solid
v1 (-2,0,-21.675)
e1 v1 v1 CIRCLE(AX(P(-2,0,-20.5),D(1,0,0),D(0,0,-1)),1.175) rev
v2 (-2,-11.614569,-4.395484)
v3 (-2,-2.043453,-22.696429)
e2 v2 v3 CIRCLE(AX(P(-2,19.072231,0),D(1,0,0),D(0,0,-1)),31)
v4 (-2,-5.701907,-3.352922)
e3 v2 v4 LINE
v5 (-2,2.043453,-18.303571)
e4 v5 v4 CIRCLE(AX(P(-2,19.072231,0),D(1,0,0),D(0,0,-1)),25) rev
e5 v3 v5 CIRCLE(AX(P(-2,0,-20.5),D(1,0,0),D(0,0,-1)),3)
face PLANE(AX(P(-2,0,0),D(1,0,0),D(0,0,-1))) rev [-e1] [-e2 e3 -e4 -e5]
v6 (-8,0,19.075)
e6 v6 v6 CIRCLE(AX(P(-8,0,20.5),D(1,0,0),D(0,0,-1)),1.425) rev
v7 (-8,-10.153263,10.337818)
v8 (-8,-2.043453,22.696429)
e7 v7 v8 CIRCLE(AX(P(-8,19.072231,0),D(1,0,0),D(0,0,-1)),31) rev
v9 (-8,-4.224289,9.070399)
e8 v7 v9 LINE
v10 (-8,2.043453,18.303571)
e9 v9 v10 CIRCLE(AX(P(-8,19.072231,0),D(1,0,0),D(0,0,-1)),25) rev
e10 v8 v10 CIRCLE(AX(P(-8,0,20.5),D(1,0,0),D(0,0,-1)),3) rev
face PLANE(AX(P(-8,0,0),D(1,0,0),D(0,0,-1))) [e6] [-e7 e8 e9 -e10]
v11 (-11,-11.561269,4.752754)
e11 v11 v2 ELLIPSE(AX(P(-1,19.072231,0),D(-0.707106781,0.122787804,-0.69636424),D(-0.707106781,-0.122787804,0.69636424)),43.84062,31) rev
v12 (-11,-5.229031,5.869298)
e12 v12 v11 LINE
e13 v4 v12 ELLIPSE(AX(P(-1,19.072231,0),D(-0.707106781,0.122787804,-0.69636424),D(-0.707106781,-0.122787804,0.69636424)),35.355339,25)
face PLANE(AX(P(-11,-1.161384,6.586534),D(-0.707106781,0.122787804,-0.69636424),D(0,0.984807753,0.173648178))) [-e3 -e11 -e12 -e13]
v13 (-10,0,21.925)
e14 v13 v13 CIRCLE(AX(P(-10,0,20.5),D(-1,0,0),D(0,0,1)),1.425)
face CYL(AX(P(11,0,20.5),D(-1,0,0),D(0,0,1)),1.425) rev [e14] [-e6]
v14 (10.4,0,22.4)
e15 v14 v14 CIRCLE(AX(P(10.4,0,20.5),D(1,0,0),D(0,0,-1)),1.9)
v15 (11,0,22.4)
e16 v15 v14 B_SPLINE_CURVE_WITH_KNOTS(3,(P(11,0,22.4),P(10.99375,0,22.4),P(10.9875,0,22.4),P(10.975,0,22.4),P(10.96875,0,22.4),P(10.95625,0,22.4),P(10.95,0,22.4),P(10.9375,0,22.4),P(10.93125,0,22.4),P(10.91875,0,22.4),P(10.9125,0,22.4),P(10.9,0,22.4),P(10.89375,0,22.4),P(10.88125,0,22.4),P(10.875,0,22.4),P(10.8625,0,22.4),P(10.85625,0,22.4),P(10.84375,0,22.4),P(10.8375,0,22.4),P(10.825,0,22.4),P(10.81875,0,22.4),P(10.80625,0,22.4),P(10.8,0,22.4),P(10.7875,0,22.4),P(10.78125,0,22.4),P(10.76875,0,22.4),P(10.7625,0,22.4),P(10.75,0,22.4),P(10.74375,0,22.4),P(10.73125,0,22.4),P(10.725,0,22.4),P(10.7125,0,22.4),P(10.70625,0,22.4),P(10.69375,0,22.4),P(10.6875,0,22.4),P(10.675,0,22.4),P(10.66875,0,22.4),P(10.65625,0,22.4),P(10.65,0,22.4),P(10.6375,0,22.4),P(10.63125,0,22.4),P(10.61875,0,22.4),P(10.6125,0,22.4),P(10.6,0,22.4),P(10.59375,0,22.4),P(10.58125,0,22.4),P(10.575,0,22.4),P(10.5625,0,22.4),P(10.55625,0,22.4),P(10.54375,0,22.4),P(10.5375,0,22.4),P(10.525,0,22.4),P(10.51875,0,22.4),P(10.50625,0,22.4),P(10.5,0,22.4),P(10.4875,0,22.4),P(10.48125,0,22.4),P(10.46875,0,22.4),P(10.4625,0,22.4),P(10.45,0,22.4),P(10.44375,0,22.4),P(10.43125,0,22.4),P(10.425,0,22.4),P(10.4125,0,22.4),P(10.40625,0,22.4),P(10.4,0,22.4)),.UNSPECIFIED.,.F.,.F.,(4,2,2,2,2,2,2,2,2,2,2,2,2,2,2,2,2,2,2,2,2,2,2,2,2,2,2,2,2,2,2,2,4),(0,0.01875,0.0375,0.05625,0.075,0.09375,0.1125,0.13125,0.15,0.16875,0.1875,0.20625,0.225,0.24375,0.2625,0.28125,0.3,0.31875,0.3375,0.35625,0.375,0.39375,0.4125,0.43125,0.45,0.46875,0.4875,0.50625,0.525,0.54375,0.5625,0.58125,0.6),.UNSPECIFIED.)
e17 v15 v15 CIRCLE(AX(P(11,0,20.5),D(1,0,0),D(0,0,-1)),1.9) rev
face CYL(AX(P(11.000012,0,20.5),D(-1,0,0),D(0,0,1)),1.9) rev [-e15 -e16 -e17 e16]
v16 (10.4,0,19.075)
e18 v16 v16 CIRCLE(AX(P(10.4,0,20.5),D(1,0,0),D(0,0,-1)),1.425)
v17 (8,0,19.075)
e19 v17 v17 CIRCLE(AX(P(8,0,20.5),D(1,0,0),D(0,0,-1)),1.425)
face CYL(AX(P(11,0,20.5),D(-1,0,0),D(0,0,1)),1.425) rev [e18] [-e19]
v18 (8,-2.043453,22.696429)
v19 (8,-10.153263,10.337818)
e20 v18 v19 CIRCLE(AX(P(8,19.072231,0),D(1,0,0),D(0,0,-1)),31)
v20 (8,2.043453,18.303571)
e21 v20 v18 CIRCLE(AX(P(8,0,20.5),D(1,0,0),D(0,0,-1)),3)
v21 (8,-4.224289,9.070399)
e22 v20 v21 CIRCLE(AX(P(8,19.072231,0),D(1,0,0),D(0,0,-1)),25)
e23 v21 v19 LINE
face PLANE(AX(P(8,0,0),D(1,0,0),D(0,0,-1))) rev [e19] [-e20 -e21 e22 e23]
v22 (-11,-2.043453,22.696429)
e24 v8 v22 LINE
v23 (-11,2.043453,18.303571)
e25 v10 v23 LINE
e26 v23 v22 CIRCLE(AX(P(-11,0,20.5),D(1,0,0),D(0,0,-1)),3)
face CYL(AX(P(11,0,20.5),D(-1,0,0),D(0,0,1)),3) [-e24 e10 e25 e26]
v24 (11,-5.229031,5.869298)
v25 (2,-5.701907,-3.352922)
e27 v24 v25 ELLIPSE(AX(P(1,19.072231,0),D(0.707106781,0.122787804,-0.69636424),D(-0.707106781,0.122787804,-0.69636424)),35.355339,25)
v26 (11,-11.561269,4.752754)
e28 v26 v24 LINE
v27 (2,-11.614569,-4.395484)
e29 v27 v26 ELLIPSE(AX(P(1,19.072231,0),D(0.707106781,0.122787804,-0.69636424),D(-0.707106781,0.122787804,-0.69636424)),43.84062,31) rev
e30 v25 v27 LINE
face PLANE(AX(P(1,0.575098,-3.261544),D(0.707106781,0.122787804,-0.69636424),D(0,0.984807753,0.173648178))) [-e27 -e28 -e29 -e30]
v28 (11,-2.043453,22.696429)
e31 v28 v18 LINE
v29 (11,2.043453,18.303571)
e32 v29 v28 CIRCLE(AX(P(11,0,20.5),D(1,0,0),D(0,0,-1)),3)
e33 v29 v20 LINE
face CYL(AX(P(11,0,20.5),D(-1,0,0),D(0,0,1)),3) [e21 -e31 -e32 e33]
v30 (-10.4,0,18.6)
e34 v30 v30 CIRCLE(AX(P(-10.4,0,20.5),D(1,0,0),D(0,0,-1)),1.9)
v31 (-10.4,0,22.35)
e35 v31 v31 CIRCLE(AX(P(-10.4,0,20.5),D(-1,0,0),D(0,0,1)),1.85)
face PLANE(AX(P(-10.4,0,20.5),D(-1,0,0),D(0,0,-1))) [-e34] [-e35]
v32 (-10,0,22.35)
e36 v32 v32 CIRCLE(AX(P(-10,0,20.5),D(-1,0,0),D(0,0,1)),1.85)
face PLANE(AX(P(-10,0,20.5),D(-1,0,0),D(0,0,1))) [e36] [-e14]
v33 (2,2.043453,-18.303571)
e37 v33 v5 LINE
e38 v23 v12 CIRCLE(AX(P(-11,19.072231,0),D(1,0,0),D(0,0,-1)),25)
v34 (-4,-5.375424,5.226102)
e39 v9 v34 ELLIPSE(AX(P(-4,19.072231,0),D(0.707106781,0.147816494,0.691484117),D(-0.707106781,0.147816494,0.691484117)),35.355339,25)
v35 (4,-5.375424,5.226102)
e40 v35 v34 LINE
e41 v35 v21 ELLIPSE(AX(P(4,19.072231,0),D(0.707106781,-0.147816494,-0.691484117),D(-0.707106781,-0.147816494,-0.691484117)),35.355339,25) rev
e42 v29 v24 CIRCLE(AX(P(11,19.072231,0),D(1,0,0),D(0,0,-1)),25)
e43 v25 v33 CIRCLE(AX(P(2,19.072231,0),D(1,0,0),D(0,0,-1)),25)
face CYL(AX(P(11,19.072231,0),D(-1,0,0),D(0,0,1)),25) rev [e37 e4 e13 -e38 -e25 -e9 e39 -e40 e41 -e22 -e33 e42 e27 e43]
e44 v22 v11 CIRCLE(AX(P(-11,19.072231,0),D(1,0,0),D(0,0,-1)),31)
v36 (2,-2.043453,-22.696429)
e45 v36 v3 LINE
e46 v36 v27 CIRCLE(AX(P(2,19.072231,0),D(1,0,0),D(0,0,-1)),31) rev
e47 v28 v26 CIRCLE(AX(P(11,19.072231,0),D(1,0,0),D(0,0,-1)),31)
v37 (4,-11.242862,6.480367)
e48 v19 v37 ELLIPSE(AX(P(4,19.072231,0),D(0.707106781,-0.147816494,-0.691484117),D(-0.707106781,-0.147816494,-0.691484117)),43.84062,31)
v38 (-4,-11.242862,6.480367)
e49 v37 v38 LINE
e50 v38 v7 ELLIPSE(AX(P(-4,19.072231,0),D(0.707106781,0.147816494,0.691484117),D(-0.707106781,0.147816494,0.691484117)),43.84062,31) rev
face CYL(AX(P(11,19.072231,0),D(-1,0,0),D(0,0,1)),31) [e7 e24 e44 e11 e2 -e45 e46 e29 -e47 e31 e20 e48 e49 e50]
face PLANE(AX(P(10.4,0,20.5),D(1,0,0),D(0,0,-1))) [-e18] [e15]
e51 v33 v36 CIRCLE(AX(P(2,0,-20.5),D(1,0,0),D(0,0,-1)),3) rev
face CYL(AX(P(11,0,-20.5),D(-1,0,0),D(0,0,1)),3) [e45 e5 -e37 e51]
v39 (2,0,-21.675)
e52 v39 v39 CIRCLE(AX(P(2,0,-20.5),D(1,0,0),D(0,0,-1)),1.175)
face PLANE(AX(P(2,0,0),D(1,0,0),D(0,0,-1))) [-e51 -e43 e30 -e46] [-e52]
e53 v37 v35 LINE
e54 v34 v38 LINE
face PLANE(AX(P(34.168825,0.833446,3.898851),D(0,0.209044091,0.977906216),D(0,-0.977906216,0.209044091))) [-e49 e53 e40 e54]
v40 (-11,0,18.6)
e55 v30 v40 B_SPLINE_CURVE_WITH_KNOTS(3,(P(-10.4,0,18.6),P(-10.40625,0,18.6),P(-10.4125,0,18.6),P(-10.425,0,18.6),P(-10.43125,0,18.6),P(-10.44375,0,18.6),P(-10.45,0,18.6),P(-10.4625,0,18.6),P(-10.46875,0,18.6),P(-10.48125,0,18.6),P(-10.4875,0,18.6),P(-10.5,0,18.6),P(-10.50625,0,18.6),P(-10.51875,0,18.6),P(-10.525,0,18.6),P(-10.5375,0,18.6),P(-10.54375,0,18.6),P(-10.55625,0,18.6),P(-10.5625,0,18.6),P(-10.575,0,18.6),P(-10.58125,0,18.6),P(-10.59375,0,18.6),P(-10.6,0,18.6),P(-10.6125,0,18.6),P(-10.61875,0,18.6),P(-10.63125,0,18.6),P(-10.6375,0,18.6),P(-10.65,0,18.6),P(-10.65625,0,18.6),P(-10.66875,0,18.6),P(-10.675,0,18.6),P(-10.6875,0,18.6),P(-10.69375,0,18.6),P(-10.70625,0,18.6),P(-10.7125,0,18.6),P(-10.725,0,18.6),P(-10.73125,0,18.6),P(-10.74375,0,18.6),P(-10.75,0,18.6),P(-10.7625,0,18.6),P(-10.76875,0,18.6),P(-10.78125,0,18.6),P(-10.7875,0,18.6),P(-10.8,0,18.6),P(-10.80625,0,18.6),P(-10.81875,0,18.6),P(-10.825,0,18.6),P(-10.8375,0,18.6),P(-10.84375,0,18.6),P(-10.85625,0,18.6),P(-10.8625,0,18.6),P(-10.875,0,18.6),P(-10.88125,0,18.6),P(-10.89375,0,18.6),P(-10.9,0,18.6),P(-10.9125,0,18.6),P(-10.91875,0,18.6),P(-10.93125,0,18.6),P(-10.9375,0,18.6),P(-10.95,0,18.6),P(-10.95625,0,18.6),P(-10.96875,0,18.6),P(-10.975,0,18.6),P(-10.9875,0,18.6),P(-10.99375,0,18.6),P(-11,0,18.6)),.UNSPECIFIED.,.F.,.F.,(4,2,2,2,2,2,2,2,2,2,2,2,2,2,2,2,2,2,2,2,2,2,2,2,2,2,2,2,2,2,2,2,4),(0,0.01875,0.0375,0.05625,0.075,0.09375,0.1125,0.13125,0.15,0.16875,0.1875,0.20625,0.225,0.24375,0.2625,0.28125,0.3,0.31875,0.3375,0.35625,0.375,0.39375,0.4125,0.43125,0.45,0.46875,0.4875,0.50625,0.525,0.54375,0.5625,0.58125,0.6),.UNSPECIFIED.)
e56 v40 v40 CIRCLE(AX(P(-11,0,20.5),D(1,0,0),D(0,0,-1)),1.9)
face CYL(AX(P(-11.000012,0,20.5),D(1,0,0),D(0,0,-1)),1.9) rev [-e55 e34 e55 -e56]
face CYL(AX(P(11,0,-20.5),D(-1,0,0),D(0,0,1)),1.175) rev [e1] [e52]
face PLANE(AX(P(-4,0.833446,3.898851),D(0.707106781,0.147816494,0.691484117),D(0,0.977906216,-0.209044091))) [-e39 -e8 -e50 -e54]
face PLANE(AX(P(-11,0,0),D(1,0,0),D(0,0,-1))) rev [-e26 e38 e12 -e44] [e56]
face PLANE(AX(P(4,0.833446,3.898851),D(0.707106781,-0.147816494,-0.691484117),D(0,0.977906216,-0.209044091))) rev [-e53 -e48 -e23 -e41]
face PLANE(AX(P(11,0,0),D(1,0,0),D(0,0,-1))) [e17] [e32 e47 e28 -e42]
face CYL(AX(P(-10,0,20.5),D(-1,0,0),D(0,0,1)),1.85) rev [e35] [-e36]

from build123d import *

# Parameters (mm, degrees)
SKETCH_1_R               = 1.175
SKETCH_1_R_2             = 1.425
EXTRUDE_1_DEPTH          = 11
CUT_EXTRUDE_1_DEPTH      = 8
CUT_EXTRUDE_1_DEPTH_BACK = 8
SKETCH_1_6_R             = 1.425
SKETCH_4_R               = 1.175
CUT_EXTRUDE_3_DEPTH      = 9
CUT_EXTRUDE_START        = -0.6
SKETCH_6_R               = 1.9
CUT_EXTRUDE_5_DEPTH      = 35.929603411
SKETCH_3_R               = 1.85
CUT_EXTRUDE_2_DEPTH      = 1
CHAMFER_2_SIZE           = 10
CHAMFER_3_SIZE           = 4


with BuildPart() as part:
    # 草图1 → 凸台-拉伸1 (new, symmetric)
    with BuildSketch(Plane(origin=(0, 0, 0), x_dir=(0, 0, -1), z_dir=(1, 0, 0))):
        with BuildLine():
            ThreePointArc((-22.696428571, -2.043453335), (0, -11.927768877), (22.696428571, -2.043453335))
            ThreePointArc((22.696428571, -2.043453335), (22.543453335, 2.196428571), (18.303571429, 2.043453335))
            ThreePointArc((18.303571429, 2.043453335), (0, -5.927768877), (-18.303571429, 2.043453335))
            ThreePointArc((-18.303571429, 2.043453335), (-22.543453335, 2.196428571), (-22.696428571, -2.043453335))
        make_face()
        with Locations((20.5, 0)):
            Circle(SKETCH_1_R, mode=Mode.SUBTRACT)
        with Locations((-20.5, 0)):
            Circle(SKETCH_1_R_2, mode=Mode.SUBTRACT)
    extrude(amount=EXTRUDE_1_DEPTH, both=True)

    # 草图1<6> → 切除-拉伸1 (cut, two sides: drawn at the far end of the back side and taken through both)
    with BuildSketch(Plane(origin=(0, 0, 0), x_dir=(0, 0, -1), z_dir=(1, 0, 0)).offset(-CUT_EXTRUDE_1_DEPTH_BACK)):
        with BuildLine():
            ThreePointArc((-22.696428571, -2.043453335), (-15.296359873, -7.89110277), (-6.48036682, -11.242861585))
            Line((-6.48036682, -11.242861585), (-5.226102274, -5.375424287))
            ThreePointArc((-5.226102274, -5.375424287), (-12.335774091, -2.672392985), (-18.303571429, 2.043453335))
            ThreePointArc((-18.303571429, 2.043453335), (-22.543453335, 2.196428571), (-22.696428571, -2.043453335))
        make_face()
        with Locations((-20.5, 0)):
            Circle(SKETCH_1_6_R, mode=Mode.SUBTRACT)
    extrude(amount=CUT_EXTRUDE_1_DEPTH + CUT_EXTRUDE_1_DEPTH_BACK, mode=Mode.SUBTRACT)

    # 草图4 → 切除-拉伸3 (cut)
    with BuildSketch(Plane(origin=(11, 0, 0), x_dir=(0, 0, -1), z_dir=(1, 0, 0))):
        with BuildLine():
            ThreePointArc((18.303571429, 2.043453335), (11.941686142, -2.891287085), (4.341204442, -5.547962703))
            Line((4.341204442, -5.547962703), (5.383093508, -11.456809221))
            ThreePointArc((5.383093508, -11.456809221), (14.807690816, -8.162531455), (22.696428571, -2.043453335))
            ThreePointArc((22.696428571, -2.043453335), (23.487928503, 0.268855462), (22.296358841, 2.402726558))
            ThreePointArc((22.296358841, 2.402726558), (20.231144538, 2.987928503), (18.303571429, 2.043453335))
        make_face()
        with Locations((20.5, 0)):
            Circle(SKETCH_4_R, mode=Mode.SUBTRACT)
    cut_extrude_3 = extrude(amount=-CUT_EXTRUDE_3_DEPTH, mode=Mode.SUBTRACT)

    # 草图6 → 切除-拉伸5 (cut)
    with BuildSketch(Plane(origin=(11, 0, 0), x_dir=(0, 0, -1), z_dir=(1, 0, 0)).offset(CUT_EXTRUDE_START)):
        with Locations(Location((-20.5, 0, 0), (0, 0, 180))):
            Circle(SKETCH_6_R)
    cut_extrude_5 = extrude(amount=CUT_EXTRUDE_5_DEPTH, mode=Mode.SUBTRACT)

    # 镜向3: 切除-拉伸3, 切除-拉伸5 across plane
    add(cut_extrude_3.mirror(Plane(origin=(0, 0, 0), x_dir=(0, 0, 1), z_dir=(1, 0, 0))), mode=Mode.SUBTRACT)
    add(cut_extrude_5.mirror(Plane(origin=(0, 0, 0), x_dir=(0, 0, 1), z_dir=(1, 0, 0))), mode=Mode.SUBTRACT)

    # 草图3 → 切除-拉伸2 (cut)
    with BuildSketch(Plane.ZY.offset(11)):
        with Locations((20.5, 0)):
            Circle(SKETCH_3_R)
    extrude(amount=-CUT_EXTRUDE_2_DEPTH, mode=Mode.SUBTRACT)

    # 倒角2
    # the kernel refuses this chamfer: 10 mm, written as the material it adds along each edge
    # the kernel refuses this chamfer: 10 mm, written as the material it takes off along each edge
    with BuildSketch(Plane(origin=(-11, 19.778170746, 0.124476202), x_dir=(-0.027495876610586313, -0.1735825242275637, 0.9844354138551714), z_dir=(0, -0.9848077530122094, -0.17364817766692373))) as chamfer_2_2_piece_1_section:
        Polygon((CHAMFER_2_SIZE * 0.999621916911, -CHAMFER_2_SIZE * 0.0274958766106), (-CHAMFER_2_SIZE * 0.0274958766106, -CHAMFER_2_SIZE * 0.999621916911), (0, 0), align=None)
    chamfer_2_2_piece_1 = extrude(amount=57.433659759, mode=Mode.PRIVATE)
    chamfer_2_2_piece_1 = split(chamfer_2_2_piece_1, bisect_by=Plane(origin=(-2, -8.783186583, -1.465639678), z_dir=(-1, 0, 0)), keep=Keep.TOP, mode=Mode.PRIVATE)
    add(chamfer_2_2_piece_1, mode=Mode.SUBTRACT)
    with BuildSketch(Plane(origin=(11, 19.778170746, 0.124476202), x_dir=(-0.9996219169112968, 0.004774608866782908, -0.027078152461972493), z_dir=(0, -0.9848077530122094, -0.17364817766692373))) as chamfer_2_2_piece_2_section:
        Polygon((CHAMFER_2_SIZE * 0.999621916911, -CHAMFER_2_SIZE * 0.0274958766106), (-CHAMFER_2_SIZE * 0.0274958766106, -CHAMFER_2_SIZE * 0.999621916911), (0, 0), align=None)
    chamfer_2_2_piece_2 = extrude(amount=57.433659759, mode=Mode.PRIVATE)
    chamfer_2_2_piece_2 = split(chamfer_2_2_piece_2, bisect_by=Plane(origin=(2, -8.783186583, -1.465639678), z_dir=(1, 0, 0)), keep=Keep.TOP, mode=Mode.PRIVATE)
    add(chamfer_2_2_piece_2, mode=Mode.SUBTRACT)

    # 倒角3
    chamfer_3_edges = [part.edges().sort_by_distance(p)[0] for p in [
        (8, -8.309142936, 5.853234547),
        (-8, -8.309142936, 5.853234547),
    ]]
    chamfer(chamfer_3_edges, length=CHAMFER_3_SIZE)


solid = part.part
